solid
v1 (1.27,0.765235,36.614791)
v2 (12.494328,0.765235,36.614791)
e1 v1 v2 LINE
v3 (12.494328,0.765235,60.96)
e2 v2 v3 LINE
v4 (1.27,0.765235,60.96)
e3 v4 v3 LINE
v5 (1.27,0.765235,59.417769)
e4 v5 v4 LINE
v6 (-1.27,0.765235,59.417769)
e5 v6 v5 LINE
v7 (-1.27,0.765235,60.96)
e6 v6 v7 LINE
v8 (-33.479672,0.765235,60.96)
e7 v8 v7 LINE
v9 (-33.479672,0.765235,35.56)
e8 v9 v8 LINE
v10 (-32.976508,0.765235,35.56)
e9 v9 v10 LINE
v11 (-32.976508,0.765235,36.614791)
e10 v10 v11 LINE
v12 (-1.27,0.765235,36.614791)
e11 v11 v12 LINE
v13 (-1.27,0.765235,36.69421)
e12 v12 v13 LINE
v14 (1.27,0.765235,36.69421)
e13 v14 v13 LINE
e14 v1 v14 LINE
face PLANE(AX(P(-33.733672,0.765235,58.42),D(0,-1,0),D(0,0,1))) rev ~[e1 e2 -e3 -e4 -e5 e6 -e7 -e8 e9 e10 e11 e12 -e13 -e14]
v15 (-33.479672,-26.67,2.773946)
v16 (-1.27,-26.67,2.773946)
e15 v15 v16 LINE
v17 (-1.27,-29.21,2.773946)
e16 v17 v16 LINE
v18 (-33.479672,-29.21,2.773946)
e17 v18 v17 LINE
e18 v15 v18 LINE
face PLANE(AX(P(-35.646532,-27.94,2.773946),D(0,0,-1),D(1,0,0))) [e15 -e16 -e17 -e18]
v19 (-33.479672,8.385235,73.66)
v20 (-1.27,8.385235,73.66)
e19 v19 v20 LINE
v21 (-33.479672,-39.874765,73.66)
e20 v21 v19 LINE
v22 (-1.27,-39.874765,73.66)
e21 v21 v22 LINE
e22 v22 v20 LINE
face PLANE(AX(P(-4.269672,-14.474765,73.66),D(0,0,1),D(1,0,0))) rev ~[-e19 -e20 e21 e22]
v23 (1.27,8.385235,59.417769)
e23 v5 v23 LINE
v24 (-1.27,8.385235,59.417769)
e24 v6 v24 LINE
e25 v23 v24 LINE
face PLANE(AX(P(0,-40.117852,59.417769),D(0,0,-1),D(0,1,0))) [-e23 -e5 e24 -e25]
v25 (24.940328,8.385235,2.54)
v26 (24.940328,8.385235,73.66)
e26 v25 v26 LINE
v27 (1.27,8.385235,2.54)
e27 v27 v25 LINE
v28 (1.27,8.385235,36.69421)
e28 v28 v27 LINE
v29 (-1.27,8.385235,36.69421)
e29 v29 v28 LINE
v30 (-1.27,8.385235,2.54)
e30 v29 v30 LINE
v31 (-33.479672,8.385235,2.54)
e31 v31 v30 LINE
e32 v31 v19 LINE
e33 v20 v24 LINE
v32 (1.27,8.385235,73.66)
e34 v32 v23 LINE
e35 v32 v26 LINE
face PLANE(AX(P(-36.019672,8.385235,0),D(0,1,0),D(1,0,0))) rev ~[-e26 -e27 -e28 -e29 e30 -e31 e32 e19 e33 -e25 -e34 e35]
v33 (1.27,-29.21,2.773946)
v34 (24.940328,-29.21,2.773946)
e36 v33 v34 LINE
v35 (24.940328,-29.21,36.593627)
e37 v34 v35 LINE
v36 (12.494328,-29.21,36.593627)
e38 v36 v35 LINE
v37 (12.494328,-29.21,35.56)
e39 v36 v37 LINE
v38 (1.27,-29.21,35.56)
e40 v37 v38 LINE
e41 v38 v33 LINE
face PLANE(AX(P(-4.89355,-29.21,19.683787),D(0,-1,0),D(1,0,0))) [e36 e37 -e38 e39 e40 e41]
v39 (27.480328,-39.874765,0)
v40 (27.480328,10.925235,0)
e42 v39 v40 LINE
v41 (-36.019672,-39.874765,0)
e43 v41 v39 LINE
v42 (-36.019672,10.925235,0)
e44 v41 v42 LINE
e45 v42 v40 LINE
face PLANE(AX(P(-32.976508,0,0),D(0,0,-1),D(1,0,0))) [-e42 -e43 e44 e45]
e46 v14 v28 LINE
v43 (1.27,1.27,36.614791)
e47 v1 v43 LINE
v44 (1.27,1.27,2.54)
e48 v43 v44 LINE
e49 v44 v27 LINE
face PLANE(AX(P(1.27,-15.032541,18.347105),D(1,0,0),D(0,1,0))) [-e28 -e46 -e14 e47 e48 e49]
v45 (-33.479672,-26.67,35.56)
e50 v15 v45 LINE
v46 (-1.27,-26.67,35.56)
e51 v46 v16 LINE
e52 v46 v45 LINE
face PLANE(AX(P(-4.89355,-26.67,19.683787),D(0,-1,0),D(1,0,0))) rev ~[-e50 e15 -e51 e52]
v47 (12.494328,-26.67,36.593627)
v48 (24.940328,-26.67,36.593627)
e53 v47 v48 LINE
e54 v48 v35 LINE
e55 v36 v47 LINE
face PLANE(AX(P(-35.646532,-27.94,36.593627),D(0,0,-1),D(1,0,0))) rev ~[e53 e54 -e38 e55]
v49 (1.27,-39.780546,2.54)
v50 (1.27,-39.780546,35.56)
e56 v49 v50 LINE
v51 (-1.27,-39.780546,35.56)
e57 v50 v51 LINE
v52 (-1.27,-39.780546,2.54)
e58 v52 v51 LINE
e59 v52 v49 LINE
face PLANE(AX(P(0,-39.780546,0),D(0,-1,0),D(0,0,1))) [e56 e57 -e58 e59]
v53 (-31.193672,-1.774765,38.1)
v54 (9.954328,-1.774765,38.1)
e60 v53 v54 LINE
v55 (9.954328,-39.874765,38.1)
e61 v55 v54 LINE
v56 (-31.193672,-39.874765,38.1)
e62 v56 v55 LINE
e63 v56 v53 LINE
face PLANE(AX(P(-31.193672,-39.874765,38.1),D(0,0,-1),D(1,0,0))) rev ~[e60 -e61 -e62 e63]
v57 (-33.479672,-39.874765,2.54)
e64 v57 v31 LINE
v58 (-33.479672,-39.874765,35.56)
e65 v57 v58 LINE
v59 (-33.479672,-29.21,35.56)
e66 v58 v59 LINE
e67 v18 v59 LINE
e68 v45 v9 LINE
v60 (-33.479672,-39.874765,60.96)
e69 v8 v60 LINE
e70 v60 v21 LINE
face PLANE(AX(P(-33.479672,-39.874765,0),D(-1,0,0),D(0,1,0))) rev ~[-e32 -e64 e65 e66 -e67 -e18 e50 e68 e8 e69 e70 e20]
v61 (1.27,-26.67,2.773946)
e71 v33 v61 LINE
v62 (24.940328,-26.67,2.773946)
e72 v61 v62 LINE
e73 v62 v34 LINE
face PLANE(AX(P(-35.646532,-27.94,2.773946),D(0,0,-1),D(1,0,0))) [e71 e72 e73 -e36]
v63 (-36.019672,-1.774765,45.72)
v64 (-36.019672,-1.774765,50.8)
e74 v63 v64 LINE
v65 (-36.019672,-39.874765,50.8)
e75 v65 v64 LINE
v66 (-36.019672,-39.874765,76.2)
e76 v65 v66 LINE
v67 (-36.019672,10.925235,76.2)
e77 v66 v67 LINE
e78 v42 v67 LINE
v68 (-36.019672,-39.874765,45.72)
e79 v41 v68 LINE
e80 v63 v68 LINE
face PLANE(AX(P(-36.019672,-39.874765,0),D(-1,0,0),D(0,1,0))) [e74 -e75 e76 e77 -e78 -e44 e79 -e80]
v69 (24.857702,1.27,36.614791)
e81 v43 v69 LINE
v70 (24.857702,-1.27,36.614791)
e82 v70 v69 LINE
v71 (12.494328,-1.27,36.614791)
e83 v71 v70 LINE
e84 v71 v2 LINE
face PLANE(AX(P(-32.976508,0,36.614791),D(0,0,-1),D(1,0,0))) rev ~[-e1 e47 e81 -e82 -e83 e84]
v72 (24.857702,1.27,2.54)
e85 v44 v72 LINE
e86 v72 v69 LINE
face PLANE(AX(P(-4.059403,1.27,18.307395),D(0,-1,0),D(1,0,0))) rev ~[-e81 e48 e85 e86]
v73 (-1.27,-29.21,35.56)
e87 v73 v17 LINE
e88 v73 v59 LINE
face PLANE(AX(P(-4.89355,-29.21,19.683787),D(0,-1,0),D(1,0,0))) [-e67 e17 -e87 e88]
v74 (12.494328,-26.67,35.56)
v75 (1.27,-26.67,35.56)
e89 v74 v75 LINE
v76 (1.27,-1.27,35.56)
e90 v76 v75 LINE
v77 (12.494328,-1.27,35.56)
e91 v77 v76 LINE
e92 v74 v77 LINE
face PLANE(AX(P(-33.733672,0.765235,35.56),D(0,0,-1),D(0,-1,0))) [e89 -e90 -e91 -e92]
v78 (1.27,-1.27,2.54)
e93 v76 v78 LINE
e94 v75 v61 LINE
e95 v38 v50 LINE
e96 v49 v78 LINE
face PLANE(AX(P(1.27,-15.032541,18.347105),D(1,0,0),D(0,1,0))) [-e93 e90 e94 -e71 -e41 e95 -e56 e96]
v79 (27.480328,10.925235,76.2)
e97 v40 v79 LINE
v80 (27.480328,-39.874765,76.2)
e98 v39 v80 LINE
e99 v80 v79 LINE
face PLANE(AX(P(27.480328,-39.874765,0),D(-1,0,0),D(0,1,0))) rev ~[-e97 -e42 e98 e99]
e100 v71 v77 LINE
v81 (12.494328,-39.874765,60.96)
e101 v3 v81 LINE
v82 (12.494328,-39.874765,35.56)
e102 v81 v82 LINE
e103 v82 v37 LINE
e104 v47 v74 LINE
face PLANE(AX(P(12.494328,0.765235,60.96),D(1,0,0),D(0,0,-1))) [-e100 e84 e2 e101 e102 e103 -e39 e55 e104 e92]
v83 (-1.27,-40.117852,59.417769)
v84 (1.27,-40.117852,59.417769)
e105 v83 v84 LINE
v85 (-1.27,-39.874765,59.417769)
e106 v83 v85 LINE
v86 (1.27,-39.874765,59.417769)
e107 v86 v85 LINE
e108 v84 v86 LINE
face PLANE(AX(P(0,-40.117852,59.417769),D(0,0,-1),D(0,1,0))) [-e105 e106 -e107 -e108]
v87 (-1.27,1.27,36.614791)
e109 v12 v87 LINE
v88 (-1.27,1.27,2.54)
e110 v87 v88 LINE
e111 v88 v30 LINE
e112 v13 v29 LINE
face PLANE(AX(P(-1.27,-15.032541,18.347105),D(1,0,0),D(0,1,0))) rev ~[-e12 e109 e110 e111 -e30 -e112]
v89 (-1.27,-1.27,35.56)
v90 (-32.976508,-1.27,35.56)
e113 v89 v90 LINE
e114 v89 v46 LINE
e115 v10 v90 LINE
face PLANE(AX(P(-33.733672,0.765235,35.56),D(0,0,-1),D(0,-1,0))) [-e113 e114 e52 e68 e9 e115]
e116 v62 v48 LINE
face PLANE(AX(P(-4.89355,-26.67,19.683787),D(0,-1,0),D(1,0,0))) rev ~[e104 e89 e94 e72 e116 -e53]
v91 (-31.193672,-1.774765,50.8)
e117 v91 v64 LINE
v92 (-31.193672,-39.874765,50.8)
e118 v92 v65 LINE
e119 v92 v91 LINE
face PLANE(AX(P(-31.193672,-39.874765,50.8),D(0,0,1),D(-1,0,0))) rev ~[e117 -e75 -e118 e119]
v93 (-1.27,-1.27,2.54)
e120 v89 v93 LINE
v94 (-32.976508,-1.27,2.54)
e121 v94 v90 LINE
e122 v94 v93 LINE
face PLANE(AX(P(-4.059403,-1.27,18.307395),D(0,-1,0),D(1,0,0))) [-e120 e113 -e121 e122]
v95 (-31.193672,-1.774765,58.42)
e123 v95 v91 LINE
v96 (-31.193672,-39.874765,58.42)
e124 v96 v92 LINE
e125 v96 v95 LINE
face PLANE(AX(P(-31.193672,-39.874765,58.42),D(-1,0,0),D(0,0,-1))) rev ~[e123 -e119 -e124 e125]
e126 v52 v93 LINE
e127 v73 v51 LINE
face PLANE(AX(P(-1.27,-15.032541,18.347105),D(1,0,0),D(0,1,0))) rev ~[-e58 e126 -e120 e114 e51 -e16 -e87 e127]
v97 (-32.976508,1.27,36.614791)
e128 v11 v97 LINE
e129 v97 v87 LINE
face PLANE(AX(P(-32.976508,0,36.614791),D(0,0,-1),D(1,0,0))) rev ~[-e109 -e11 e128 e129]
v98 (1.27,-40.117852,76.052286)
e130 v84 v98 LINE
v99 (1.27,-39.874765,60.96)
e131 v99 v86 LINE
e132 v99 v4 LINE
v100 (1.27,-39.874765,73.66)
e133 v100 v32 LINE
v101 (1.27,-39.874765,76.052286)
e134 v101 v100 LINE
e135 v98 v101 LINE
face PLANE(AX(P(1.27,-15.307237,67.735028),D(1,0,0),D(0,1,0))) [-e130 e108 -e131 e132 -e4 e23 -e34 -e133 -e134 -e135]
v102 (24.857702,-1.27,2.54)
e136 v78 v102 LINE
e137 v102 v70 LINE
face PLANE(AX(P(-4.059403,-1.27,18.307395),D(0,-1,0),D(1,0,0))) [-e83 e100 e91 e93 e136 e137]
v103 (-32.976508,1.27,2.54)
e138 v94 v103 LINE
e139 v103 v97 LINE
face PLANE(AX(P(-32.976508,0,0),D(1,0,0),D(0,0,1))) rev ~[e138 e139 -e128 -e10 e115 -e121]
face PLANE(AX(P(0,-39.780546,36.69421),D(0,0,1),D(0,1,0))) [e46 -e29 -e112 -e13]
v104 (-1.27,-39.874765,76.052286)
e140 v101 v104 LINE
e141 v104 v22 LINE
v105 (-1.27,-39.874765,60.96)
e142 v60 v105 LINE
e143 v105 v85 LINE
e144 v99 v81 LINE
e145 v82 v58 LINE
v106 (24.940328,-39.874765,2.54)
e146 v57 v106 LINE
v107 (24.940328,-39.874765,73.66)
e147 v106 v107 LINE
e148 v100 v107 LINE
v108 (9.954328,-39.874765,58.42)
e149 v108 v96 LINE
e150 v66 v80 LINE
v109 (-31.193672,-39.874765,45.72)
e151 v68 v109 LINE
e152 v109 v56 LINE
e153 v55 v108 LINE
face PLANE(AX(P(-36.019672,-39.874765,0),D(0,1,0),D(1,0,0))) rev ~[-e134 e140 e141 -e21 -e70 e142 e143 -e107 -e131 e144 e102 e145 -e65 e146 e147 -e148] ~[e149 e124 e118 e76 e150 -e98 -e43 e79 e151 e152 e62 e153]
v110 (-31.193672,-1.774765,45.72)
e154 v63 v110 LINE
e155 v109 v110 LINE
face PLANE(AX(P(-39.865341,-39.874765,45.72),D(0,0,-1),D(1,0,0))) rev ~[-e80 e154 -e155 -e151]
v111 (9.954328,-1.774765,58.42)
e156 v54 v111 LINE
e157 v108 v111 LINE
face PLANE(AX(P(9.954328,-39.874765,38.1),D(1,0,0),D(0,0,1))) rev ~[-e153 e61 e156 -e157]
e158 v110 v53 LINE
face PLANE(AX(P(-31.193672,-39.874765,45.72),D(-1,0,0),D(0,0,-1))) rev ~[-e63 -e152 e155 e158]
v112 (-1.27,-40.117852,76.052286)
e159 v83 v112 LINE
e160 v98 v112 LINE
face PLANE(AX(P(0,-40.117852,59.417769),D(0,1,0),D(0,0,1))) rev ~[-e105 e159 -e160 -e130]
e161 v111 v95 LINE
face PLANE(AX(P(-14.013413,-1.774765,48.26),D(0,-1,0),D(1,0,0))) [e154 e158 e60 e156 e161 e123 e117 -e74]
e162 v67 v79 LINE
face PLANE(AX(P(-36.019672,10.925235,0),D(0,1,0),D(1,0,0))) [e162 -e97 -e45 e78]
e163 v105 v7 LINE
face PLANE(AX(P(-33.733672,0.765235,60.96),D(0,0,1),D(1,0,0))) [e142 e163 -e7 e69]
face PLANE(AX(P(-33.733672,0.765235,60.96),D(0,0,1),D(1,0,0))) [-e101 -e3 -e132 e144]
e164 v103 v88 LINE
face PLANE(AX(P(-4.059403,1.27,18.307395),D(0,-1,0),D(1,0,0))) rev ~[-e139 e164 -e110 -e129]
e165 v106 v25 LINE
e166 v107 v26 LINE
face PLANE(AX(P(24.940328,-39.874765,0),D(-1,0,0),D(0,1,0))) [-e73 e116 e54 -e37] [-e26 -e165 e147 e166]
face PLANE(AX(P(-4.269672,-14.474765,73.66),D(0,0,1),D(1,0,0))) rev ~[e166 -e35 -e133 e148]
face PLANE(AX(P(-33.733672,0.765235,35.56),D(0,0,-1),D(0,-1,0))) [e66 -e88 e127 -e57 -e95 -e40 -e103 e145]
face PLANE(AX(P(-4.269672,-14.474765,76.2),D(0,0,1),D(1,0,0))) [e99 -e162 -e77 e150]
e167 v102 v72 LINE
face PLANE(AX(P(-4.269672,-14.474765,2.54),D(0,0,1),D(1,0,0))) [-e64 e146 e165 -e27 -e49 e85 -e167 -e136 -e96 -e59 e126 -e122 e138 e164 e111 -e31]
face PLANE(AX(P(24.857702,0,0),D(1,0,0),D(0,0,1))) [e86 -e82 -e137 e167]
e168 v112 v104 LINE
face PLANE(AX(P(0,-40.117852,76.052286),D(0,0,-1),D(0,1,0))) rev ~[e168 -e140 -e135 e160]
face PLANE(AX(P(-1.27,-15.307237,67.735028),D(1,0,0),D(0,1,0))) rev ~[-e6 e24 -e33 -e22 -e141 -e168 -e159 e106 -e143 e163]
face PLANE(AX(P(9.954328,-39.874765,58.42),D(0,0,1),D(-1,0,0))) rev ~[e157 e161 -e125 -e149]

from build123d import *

# Parameters (mm, degrees)
F0_W         = 63.5
F0_H         = 50.8
F1_DEPTH     = 76.2
F3_DEPTH     = 38.1
F4_T         = 2.54
F4_T3_DEPTH  = 9.906
F4_T5_DEPTH  = 46.228
F4_T7_DEPTH  = 12.7
F4_T9_DEPTH  = 12.7
F4_T11_DEPTH = 25.4
F4_T13_DEPTH = 43.18
F5_W         = 49.4960099459
F5_H         = 36.6942100227
F5_W_2       = 49.6212309226
F5_H_2       = 16.634516418
F6_DEPTH     = 1.27
F7_W         = 57.8342098743
F7_H         = 36.6147905588
F8_DEPTH     = 1.27
F10_W        = 61.5059640259
F10_H        = 33.8196810335
F11_DEPTH    = 1.27


# Not quite as in the source:
# - a shell that OpenCascade refuses in one call is made with other operations: the cavity is built on its own and cut out


with BuildPart() as f1:
    # F0 (on Top) → F1 (new body)
    with BuildSketch(Plane.XY):
        with Locations((-4.2696721688, -14.4747652373)):
            Rectangle(F0_W, F0_H)
    extrude(amount=F1_DEPTH)

    # F2 (on face) → F3 (cut)
    with BuildSketch(Plane.XZ.offset(39.8747652373)):
        Polygon((9.9543278312, 58.42), (-31.1936721688, 58.42), (-31.1936721688, 50.8), (-39.8653410375, 50.8), (-39.8653410375, 45.72), (-31.1936721688, 45.72), (-31.1936721688, 38.1), (9.9543278312, 38.1), align=None)
    extrude(amount=-F3_DEPTH, mode=Mode.SUBTRACT)

    # F4: shell of thickness 2.54, made by hand


with BuildPart() as f4_core1:
    # F4_t2: copy of F1
    add(f1.part)

    # the walls: a layer under each face that stays
    f4_faces = [f4_core1.faces().sort_by_distance(p)[0] for p in [
        (-4.2696721688, 10.9252347627, 38.1),
        (27.4803278312, -14.4747652373, 38.1),
        (-36.0196721688, -14.4747652373, 38.1),
        (-4.2696721688, -14.4747652373, 0),
        (-4.2696721688, -14.4747652373, 76.2),
        (-33.6066721688, -20.8247652373, 45.72),
        (-13.0326721688, -1.7747652373, 48.26),
        (-33.6066721688, -20.8247652373, 50.8),
        (-31.1936721688, -20.8247652373, 54.61),
        (-10.6196721688, -20.8247652373, 58.42),
        (9.9543278312, -20.8247652373, 48.26),
        (-10.6196721688, -20.8247652373, 38.1),
        (-31.1936721688, -20.8247652373, 41.91),
    ]]
    thicken(f4_faces, amount=-F4_T, mode=Mode.SUBTRACT)

    # F4_s4 → F4_t3 (cut)
    with BuildSketch(Plane.YZ.offset(-38.5596721688)):
        Polygon((-1.8001652373, 45.7454), (-1.7747652373, 43.18), (0.7652347627, 43.18), (0.7652347627, 45.72), align=None)
        Polygon((-1.8001652373, 50.7746), (0.7652347627, 50.8), (0.7652347627, 53.34), (-1.7747652373, 53.34), align=None)
    extrude(amount=F4_T3_DEPTH, mode=Mode.SUBTRACT)

    # F4_s6 → F4_t5 (cut)
    with BuildSketch(Plane.YZ.offset(-33.7336721688)):
        Polygon((-1.8001652373, 38.1254), (0.7652347627, 38.1), (0.7652347627, 35.56), (-1.7747652373, 35.56), align=None)
        Polygon((-1.8001652373, 58.3946), (0.7652347627, 58.42), (0.7652347627, 60.96), (-1.7747652373, 60.96), align=None)
    extrude(amount=F4_T5_DEPTH, mode=Mode.SUBTRACT)

    # F4_s8 → F4_t7 (cut)
    with BuildSketch(Plane.XY.offset(35.56)):
        Polygon((-31.1682721688, -1.8001652373), (-31.1936721688, 0.7652347627), (-33.7336721688, 0.7652347627), (-33.7336721688, -1.7747652373), align=None)
    extrude(amount=F4_T7_DEPTH, mode=Mode.SUBTRACT)

    # F4_s10 → F4_t9 (cut)
    with BuildSketch(Plane.XY.offset(48.26)):
        Polygon((-31.1682721688, -1.8001652373), (-31.1936721688, 0.7652347627), (-33.7336721688, 0.7652347627), (-33.7336721688, -1.7747652373), align=None)
    extrude(amount=F4_T9_DEPTH, mode=Mode.SUBTRACT)

    # F4_s12 → F4_t11 (cut)
    with BuildSketch(Plane.XY.offset(35.56)):
        Polygon((9.9289278312, -1.8001652373), (9.9543278312, 0.7652347627), (12.4943278312, 0.7652347627), (12.4943278312, -1.7747652373), align=None)
    extrude(amount=F4_T11_DEPTH, mode=Mode.SUBTRACT)

    # F4_s14 → F4_t13 (cut)
    with BuildSketch(Plane.XZ.offset(-0.7652347627)):
        Polygon((-31.1682721688, 58.3946), (-33.7336721688, 58.42), (-33.7336721688, 60.96), (-31.1936721688, 60.96), align=None)
        Polygon((9.9289278312, 58.3946), (9.9543278312, 60.96), (12.4943278312, 60.96), (12.4943278312, 58.42), align=None)
        Polygon((9.9289278312, 38.1254), (12.4943278312, 38.1), (12.4943278312, 35.56), (9.9543278312, 35.56), align=None)
        Polygon((-31.1682721688, 38.1254), (-31.1936721688, 35.56), (-33.7336721688, 35.56), (-33.7336721688, 38.1), align=None)
    extrude(amount=F4_T13_DEPTH, mode=Mode.SUBTRACT)


with BuildPart() as f1_1:
    add(f1.part)

    # what is left inside the walls is the cavity
    f4_cavity = [f4_core1.part.solids().sort_by_distance(p)[0] for p in [
        (-4.269672, 8.359835, 49.953333),
    ]]
    add(f4_cavity, mode=Mode.SUBTRACT)

    # F5 (on Right) → F6 (join, symmetric)
    with BuildSketch(Plane.YZ):
        with Locations((-15.0325410068, 18.3471050113)):
            Rectangle(F5_W, F5_H)
        with Locations((-15.3072369285, 67.7350275218)):
            Rectangle(F5_W_2, F5_H_2)
    extrude(amount=F6_DEPTH, both=True)

    # F7 (on Front) → F8 (join, symmetric)
    with BuildSketch(Plane.XZ):
        with Locations((-4.0594032034, 18.3073952794)):
            Rectangle(F7_W, F7_H)
    extrude(amount=F8_DEPTH, both=True)

    # F10 (on offset) → F11 (join, symmetric)
    with BuildSketch(Plane.XZ.offset(27.94)):
        with Locations((-4.893549718, 19.6837866679)):
            Rectangle(F10_W, F10_H)
    extrude(amount=F11_DEPTH, both=True)


solid = f1_1.part
